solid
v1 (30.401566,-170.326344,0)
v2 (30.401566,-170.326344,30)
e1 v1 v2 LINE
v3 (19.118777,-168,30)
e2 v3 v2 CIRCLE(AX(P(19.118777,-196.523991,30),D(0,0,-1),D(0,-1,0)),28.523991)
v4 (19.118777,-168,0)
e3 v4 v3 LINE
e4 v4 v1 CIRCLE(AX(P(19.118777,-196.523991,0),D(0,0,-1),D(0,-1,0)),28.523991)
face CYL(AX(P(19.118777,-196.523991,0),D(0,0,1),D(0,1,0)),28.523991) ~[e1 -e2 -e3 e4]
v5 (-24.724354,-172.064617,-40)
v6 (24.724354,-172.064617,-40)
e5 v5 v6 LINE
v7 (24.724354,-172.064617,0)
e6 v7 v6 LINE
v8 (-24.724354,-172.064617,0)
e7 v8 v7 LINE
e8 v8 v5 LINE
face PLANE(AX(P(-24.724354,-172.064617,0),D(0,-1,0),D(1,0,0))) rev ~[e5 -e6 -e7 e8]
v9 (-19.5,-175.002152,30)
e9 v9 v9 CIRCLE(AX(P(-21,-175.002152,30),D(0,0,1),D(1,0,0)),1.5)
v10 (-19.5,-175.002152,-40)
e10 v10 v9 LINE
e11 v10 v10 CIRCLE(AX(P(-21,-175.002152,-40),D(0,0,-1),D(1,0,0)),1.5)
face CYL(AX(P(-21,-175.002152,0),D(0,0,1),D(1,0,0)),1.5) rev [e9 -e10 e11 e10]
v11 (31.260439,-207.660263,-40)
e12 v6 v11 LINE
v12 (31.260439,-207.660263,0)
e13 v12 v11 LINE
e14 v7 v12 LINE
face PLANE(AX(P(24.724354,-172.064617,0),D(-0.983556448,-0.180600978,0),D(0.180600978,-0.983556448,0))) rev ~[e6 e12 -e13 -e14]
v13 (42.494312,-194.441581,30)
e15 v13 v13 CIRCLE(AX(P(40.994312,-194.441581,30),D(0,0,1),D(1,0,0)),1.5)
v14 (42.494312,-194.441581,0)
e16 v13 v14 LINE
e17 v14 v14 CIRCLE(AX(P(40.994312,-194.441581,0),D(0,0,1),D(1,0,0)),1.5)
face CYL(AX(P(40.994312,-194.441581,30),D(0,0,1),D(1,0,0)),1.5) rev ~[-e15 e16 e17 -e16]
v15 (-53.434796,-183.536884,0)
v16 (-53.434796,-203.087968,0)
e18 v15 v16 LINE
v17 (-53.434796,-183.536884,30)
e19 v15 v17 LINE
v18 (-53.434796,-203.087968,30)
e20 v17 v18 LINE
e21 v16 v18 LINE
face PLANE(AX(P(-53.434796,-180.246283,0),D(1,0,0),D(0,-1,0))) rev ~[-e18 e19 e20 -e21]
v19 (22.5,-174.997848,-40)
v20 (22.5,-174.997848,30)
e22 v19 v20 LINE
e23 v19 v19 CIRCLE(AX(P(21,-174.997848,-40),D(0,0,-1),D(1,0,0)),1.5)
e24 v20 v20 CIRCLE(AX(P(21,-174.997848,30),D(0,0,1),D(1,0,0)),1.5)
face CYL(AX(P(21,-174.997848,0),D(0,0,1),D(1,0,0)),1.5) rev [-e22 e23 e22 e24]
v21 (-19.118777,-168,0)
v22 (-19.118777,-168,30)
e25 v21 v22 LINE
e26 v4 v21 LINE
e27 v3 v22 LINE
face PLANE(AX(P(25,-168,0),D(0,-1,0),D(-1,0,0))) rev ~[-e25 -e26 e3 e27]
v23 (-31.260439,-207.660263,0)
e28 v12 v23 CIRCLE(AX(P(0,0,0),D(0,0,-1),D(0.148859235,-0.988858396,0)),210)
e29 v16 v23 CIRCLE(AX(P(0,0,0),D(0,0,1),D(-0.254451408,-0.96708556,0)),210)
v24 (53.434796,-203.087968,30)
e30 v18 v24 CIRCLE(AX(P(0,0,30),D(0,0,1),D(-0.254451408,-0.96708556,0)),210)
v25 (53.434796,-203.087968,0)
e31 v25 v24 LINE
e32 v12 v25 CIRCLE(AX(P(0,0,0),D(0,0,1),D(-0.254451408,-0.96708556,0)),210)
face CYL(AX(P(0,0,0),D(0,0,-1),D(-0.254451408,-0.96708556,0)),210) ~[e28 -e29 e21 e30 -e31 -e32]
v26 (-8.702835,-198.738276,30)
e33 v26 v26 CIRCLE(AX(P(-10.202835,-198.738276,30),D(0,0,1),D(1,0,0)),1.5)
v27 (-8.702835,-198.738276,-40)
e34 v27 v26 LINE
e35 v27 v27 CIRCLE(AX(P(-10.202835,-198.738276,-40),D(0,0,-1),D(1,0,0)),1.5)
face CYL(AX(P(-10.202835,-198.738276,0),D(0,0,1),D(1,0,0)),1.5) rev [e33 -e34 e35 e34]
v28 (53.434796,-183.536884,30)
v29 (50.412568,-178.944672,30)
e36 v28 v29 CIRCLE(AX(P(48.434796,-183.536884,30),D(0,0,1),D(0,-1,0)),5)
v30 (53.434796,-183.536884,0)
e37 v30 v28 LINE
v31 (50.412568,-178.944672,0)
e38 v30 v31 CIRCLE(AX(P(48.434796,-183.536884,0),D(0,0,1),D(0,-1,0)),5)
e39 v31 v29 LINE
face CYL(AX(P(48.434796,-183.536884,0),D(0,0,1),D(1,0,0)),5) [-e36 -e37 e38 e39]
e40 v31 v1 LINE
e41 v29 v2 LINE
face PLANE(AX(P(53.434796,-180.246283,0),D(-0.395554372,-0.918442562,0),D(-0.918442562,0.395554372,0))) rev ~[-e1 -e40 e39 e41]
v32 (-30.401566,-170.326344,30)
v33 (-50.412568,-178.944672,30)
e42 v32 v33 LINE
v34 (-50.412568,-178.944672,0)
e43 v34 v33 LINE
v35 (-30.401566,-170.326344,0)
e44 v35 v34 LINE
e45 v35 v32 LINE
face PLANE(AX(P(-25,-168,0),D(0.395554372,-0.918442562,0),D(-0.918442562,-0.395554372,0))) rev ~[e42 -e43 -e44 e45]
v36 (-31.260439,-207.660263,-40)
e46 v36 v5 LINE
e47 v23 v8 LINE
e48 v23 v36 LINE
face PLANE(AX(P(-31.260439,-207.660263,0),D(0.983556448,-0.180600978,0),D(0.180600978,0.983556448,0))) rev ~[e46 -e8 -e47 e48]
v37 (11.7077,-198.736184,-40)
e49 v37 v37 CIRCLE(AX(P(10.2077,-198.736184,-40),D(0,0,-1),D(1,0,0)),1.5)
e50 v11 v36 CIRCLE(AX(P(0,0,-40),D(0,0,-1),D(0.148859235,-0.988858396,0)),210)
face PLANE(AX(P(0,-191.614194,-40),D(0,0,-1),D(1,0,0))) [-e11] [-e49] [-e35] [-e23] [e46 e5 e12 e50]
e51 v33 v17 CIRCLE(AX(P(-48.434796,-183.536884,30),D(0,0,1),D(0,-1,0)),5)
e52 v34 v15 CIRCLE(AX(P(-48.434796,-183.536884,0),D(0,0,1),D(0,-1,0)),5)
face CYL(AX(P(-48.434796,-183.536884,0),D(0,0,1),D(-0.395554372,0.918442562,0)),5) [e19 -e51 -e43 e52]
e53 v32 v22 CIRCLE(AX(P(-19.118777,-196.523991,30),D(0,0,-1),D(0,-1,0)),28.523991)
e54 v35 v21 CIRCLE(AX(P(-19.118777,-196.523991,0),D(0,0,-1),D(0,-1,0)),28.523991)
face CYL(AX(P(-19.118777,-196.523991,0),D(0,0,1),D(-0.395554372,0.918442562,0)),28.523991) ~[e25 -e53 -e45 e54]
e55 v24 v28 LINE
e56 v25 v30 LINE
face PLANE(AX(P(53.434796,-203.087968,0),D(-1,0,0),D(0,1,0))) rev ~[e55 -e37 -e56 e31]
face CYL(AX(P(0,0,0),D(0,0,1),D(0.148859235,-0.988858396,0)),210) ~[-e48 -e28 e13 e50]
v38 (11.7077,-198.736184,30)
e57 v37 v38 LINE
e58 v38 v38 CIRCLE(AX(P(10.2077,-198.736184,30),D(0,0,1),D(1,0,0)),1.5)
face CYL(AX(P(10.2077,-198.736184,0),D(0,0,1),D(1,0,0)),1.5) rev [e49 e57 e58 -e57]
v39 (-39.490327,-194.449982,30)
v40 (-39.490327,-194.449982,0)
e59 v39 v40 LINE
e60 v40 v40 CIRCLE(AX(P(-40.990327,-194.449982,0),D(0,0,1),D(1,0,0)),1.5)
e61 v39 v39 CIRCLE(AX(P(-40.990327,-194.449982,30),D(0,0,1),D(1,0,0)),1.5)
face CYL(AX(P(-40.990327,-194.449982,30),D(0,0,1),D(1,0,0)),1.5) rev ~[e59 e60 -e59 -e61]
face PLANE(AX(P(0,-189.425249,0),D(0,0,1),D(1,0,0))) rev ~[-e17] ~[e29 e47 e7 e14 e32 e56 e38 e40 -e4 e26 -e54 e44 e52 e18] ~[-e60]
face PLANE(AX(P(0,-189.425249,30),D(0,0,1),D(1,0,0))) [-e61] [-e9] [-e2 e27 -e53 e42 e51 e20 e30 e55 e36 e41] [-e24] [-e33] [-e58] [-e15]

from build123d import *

# Parameters (mm, degrees)
F1_DEPTH = 30
F2_R     = 1.5
F3_DEPTH = 30.001
F4_R     = 28.5239911769
F5_R     = 5
F7_R     = 1.5
F8_DEPTH = 40


with BuildPart() as f1:
    # F0 (on Top) → F1 (new body)
    with BuildSketch(Plane.XY):
        with BuildLine():
            Line((-53.4347956585, -180.2462832153), (-53.4347956585, -203.0879676715))
            ThreePointArc((-53.4347956585, -203.0879676715), (0, -210), (53.4347956585, -203.0879676715))
            Line((53.4347956585, -203.0879676715), (53.4347956585, -180.2462832153))
            Line((53.4347956585, -180.2462832153), (25, -168))
            Line((25, -168), (0, -168))
            Line((0, -168), (-25, -168))
            Line((-25, -168), (-53.4347956585, -180.2462832153))
        make_face()
    extrude(amount=F1_DEPTH)

    # F2 (on face) → F3 (cut, through all)
    with BuildSketch(Plane.XY.offset(30)):
        with Locations((-61.4929363222, -189.1117421473)):
            Circle(F2_R)
        with Locations((-116.9707156809, -160.8515617902)):
            Circle(F2_R)
        with Locations((-161.0003432552, -116.8309564779)):
            Circle(F2_R)
        with Locations((-189.2718923255, -61.3589697679)):
            Circle(F2_R)
        with Locations((-199.0179466895, 0.1344137845)):
            Circle(F2_R)
        with Locations((61.4958267934, -189.0991398316)):
            Circle(F2_R)
        with Locations((116.9678135034, -160.8275907612)):
            Circle(F2_R)
        with Locations((160.9884188157, -116.7979631869)):
            Circle(F2_R)
        with Locations((189.2485991728, -61.3201838282)):
            Circle(F2_R)
        with Locations((198.9820512211, 0.175195735)):
            Circle(F2_R)
        with Locations((-20.9999999994, -175.0021517963)):
            Circle(F2_R)
        with Locations((-40.9903269079, -194.4499816389)):
            Circle(F2_R)
        with Locations((-10.2028351662, -198.7382755147)):
            Circle(F2_R)
        with Locations((20.9999997802, -174.9978481734)):
            Circle(F2_R)
        with Locations((10.2076995225, -198.7361841041)):
            Circle(F2_R)
        with Locations((40.9943117987, -194.4415809015)):
            Circle(F2_R)
    extrude(amount=-F3_DEPTH, mode=Mode.SUBTRACT)

    # F4
    f4_edges = [f1.edges().sort_by_distance(p)[0] for p in [
        (25, -168, 15),
        (-25, -168, 15),
    ]]
    fillet(f4_edges, radius=F4_R)

    # F5
    f5_edges = [f1.edges().sort_by_distance(p)[0] for p in [
        (53.434796, -180.246283, 15),
        (-53.434796, -180.246283, 15),
    ]]
    fillet(f5_edges, radius=F5_R)

    # F7 (on face) → F8 (join)
    with BuildSketch(Plane(origin=(0, 0, 0), x_dir=(1, 0, 0), z_dir=(0, 0, -1))):
        with BuildLine():
            ThreePointArc((31.2604393052, 207.6602632533), (0, 210), (-31.2604393052, 207.6602632533))
            Line((-31.2604393052, 207.6602632533), (-24.7243543685, 172.0646172762))
            Line((-24.7243543685, 172.0646172762), (0, 172.0646172762))
            Line((0, 172.0646172762), (24.7243543685, 172.0646172762))
            Line((24.7243543685, 172.0646172762), (31.2604393052, 207.6602632533))
        make_face()
        with Locations((-20.9999999994, 175.0021517963)):
            Circle(F7_R, mode=Mode.SUBTRACT)
        with Locations((20.9999997802, 174.9978481734)):
            Circle(F7_R, mode=Mode.SUBTRACT)
        with Locations((-10.2028351662, 198.7382755147)):
            Circle(F7_R, mode=Mode.SUBTRACT)
        with Locations((10.2076995225, 198.7361841041)):
            Circle(F7_R, mode=Mode.SUBTRACT)
    extrude(amount=F8_DEPTH)


solid = f1.part
